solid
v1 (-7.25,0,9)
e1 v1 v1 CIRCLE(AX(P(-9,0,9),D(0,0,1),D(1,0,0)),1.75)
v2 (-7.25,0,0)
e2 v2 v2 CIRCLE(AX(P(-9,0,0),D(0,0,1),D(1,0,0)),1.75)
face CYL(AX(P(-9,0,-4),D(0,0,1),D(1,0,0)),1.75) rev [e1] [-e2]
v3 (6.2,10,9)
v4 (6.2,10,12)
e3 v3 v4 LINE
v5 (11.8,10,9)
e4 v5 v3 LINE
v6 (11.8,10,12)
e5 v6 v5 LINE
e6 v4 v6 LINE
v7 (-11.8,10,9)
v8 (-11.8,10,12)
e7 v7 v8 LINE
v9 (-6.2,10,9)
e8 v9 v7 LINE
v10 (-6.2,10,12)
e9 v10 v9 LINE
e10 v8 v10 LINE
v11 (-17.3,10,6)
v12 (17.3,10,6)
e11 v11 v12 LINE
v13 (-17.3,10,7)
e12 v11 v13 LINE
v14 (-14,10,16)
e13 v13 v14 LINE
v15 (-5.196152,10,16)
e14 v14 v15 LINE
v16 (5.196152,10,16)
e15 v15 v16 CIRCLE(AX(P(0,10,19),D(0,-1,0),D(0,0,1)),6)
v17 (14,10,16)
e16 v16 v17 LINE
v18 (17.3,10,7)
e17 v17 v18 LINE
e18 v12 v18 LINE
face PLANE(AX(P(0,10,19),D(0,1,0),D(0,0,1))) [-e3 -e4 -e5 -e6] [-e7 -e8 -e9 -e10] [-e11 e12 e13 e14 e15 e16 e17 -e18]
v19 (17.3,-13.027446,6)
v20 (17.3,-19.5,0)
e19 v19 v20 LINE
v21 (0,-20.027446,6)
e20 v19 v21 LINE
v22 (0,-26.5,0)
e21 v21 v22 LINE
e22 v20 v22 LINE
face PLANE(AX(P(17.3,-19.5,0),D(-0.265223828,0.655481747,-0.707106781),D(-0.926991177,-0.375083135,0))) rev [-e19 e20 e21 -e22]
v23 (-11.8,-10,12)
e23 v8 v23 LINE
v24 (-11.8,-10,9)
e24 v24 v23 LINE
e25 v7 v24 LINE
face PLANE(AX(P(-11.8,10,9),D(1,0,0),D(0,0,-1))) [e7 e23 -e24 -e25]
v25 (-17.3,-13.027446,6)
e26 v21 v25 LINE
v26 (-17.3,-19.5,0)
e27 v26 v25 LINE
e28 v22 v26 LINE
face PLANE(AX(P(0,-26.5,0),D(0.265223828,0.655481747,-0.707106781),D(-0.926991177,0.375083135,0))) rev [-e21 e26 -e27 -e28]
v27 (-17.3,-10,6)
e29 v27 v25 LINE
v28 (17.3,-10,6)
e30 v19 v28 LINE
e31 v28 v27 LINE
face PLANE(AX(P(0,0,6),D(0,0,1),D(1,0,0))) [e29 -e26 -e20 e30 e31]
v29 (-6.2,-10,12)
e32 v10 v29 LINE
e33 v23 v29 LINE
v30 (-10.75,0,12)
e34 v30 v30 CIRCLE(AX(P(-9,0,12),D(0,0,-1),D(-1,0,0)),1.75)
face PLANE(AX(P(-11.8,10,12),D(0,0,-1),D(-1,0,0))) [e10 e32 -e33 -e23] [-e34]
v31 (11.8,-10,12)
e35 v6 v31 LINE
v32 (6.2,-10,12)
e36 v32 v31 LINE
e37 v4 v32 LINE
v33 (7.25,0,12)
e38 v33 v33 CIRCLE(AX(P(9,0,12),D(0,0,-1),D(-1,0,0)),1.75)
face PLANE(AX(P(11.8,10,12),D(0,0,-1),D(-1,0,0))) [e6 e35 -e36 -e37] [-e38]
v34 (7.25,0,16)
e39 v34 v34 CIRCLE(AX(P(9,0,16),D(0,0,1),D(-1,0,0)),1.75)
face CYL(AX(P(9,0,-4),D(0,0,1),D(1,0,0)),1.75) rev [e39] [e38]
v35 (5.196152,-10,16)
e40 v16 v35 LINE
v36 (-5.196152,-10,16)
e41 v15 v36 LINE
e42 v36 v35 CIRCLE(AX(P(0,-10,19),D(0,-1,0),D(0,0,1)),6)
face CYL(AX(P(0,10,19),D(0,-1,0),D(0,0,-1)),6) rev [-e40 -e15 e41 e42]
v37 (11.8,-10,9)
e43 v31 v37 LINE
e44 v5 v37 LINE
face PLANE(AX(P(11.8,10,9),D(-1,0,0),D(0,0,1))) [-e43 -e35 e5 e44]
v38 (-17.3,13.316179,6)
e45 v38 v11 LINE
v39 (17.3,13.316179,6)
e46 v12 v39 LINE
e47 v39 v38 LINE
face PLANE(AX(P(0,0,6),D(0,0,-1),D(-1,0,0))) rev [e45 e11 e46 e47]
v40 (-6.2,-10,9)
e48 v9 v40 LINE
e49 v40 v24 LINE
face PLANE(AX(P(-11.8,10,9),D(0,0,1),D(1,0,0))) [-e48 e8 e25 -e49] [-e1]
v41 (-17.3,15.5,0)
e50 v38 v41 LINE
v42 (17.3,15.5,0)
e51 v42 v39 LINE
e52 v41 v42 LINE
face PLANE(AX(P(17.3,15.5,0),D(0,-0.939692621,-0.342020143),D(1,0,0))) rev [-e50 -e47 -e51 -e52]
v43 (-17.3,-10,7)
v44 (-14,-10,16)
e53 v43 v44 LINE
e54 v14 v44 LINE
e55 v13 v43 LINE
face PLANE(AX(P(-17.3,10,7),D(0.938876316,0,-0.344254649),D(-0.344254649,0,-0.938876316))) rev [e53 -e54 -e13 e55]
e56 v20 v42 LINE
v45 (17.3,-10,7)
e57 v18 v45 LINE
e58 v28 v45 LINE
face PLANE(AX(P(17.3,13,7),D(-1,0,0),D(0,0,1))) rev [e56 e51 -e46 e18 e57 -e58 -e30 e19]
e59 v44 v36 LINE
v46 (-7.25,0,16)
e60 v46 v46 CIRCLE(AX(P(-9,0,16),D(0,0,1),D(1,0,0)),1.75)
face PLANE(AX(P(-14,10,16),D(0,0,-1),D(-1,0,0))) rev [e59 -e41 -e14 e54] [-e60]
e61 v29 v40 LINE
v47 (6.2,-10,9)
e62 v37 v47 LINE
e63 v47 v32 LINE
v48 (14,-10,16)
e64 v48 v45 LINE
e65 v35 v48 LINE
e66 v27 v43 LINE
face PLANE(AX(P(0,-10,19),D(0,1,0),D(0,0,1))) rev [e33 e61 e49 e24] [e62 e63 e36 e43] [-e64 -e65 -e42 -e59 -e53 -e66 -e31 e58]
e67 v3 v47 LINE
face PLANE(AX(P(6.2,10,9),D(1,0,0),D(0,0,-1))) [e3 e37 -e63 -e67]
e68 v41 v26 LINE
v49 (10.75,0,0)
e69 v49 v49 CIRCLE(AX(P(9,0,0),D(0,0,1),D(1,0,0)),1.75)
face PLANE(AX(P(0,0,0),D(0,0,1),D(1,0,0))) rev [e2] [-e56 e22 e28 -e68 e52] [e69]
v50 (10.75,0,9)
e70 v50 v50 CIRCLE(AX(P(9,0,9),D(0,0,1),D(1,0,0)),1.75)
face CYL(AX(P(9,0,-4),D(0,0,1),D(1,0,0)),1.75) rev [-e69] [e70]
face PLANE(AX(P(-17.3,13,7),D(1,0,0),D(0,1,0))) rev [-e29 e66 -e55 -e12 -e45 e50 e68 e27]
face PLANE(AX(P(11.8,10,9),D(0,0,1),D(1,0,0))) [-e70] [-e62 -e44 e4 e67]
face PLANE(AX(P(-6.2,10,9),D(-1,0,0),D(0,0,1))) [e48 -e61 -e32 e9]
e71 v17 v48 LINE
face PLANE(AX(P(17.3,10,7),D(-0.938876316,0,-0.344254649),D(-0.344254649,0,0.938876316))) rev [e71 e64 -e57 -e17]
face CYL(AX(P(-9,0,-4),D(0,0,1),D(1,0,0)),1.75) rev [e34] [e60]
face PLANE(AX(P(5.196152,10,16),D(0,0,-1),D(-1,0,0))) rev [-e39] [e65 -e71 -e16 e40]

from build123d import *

# Parameters (mm, degrees)
ESBO_O1_W                = 34.6
ESBO_O1_H                = 26
RESSALTO_EXTRUS_O1_DEPTH = 7
ESBO_O10_W               = 34.6
ESBO_O10_H               = 2.5
RESSALTO_EXTRUS_O4_DEPTH = 7
CHANFRO1_SIZE            = 7
CHANFRO2_SIZE2           = 7
CHANFRO2_SIZE            = 2.54779164
ESBO_O11_W               = 5.6
ESBO_O11_H               = 3
RESSALTO_EXTRUS_O5_DEPTH = 10
ESBO_O12_R               = 1.75
CORTE_EXTRUS_O1_DEPTH    = 20
ESBO_O13_W               = 34.6
ESBO_O13_H               = 5.5
ESBO_O13_H_2             = 18.393079324
CORTE_EXTRUS_O2_DEPTH    = 1


with BuildPart() as part:
    # Esboço1 → Ressalto-extrusão1 (new body)
    with BuildSketch(Plane.XY):
        Rectangle(ESBO_O1_W, ESBO_O1_H)
    extrude(amount=RESSALTO_EXTRUS_O1_DEPTH)

    # Esboço10 → Ressalto-extrusão4 (add)
    with BuildSketch(Plane(origin=(0, 0, 0), x_dir=(-1, 0, 0), z_dir=(0, 0, -1))):
        Polygon((-17.3, -19.5), (0, -26.5), (17.3, -19.5), (17.3, -13), (-17.3, -13), align=None)
        with Locations((0, 14.25)):
            Rectangle(ESBO_O10_W, ESBO_O10_H)
    extrude(amount=-RESSALTO_EXTRUS_O4_DEPTH)

    # Chanfro1
    chanfro1_edges = [part.edges().sort_by_distance(p)[0] for p in [
        (8.65, -23, 7),
        (-8.65, -23, 7),
    ]]
    chamfer(chanfro1_edges, length=CHANFRO1_SIZE - 0.0001)  # a hair under: the kernel refuses the full size

    # Chanfro2
    chanfro2_edges = [part.edges().sort_by_distance(p)[0] for p in [
        (0, 15.5, 7),
    ]]
    chanfro2_side = [part.faces().sort_by_distance(p)[0] for p in [
        (0, 15.449044167, 7),
    ]]
    chamfer(chanfro2_edges, length=CHANFRO2_SIZE - 0.0001, length2=CHANFRO2_SIZE2 - 0.0001, reference=chanfro2_side[0])  # a hair under: the kernel refuses the full size

    # Esboço11 → Ressalto-extrusão5 (add, symmetric)
    with BuildSketch(Plane(origin=(0, 0, 0), x_dir=(1, 0, 0), z_dir=(0, 1, 0))):
        with BuildLine():
            Line((-17.3, -7), (-14, -16))
            Line((-14, -16), (-5.196152423, -16))
            ThreePointArc((-5.196152423, -16), (0, -13), (5.196152423, -16))
            Line((5.196152423, -16), (14, -16))
            Line((14, -16), (17.3, -7))
            Line((17.3, -7), (-17.3, -7))
        make_face()
        with Locations((-9, -10.5)):
            Rectangle(ESBO_O11_W, ESBO_O11_H, mode=Mode.SUBTRACT)
        with Locations((9, -10.5)):
            Rectangle(ESBO_O11_W, ESBO_O11_H, mode=Mode.SUBTRACT)
    extrude(amount=RESSALTO_EXTRUS_O5_DEPTH, both=True)

    # Esboço12 → Corte-extrusão1 (cut)
    with BuildSketch(Plane.XY.offset(16)):
        with Locations((-9, 0)):
            Circle(ESBO_O12_R)
        with Locations(Location((9, 0, 0), (0, 0, 180))):
            Circle(ESBO_O12_R)
    extrude(amount=-CORTE_EXTRUS_O1_DEPTH, mode=Mode.SUBTRACT)

    # Esboço13 → Corte-extrusão2 (cut)
    with BuildSketch(Plane.XY.offset(7)):
        with Locations((0, 12.75)):
            Rectangle(ESBO_O13_W, ESBO_O13_H)
        with Locations((0, -19.196539662)):
            Rectangle(ESBO_O13_W, ESBO_O13_H_2)
    extrude(amount=-CORTE_EXTRUS_O2_DEPTH, mode=Mode.SUBTRACT)


solid = part.part
